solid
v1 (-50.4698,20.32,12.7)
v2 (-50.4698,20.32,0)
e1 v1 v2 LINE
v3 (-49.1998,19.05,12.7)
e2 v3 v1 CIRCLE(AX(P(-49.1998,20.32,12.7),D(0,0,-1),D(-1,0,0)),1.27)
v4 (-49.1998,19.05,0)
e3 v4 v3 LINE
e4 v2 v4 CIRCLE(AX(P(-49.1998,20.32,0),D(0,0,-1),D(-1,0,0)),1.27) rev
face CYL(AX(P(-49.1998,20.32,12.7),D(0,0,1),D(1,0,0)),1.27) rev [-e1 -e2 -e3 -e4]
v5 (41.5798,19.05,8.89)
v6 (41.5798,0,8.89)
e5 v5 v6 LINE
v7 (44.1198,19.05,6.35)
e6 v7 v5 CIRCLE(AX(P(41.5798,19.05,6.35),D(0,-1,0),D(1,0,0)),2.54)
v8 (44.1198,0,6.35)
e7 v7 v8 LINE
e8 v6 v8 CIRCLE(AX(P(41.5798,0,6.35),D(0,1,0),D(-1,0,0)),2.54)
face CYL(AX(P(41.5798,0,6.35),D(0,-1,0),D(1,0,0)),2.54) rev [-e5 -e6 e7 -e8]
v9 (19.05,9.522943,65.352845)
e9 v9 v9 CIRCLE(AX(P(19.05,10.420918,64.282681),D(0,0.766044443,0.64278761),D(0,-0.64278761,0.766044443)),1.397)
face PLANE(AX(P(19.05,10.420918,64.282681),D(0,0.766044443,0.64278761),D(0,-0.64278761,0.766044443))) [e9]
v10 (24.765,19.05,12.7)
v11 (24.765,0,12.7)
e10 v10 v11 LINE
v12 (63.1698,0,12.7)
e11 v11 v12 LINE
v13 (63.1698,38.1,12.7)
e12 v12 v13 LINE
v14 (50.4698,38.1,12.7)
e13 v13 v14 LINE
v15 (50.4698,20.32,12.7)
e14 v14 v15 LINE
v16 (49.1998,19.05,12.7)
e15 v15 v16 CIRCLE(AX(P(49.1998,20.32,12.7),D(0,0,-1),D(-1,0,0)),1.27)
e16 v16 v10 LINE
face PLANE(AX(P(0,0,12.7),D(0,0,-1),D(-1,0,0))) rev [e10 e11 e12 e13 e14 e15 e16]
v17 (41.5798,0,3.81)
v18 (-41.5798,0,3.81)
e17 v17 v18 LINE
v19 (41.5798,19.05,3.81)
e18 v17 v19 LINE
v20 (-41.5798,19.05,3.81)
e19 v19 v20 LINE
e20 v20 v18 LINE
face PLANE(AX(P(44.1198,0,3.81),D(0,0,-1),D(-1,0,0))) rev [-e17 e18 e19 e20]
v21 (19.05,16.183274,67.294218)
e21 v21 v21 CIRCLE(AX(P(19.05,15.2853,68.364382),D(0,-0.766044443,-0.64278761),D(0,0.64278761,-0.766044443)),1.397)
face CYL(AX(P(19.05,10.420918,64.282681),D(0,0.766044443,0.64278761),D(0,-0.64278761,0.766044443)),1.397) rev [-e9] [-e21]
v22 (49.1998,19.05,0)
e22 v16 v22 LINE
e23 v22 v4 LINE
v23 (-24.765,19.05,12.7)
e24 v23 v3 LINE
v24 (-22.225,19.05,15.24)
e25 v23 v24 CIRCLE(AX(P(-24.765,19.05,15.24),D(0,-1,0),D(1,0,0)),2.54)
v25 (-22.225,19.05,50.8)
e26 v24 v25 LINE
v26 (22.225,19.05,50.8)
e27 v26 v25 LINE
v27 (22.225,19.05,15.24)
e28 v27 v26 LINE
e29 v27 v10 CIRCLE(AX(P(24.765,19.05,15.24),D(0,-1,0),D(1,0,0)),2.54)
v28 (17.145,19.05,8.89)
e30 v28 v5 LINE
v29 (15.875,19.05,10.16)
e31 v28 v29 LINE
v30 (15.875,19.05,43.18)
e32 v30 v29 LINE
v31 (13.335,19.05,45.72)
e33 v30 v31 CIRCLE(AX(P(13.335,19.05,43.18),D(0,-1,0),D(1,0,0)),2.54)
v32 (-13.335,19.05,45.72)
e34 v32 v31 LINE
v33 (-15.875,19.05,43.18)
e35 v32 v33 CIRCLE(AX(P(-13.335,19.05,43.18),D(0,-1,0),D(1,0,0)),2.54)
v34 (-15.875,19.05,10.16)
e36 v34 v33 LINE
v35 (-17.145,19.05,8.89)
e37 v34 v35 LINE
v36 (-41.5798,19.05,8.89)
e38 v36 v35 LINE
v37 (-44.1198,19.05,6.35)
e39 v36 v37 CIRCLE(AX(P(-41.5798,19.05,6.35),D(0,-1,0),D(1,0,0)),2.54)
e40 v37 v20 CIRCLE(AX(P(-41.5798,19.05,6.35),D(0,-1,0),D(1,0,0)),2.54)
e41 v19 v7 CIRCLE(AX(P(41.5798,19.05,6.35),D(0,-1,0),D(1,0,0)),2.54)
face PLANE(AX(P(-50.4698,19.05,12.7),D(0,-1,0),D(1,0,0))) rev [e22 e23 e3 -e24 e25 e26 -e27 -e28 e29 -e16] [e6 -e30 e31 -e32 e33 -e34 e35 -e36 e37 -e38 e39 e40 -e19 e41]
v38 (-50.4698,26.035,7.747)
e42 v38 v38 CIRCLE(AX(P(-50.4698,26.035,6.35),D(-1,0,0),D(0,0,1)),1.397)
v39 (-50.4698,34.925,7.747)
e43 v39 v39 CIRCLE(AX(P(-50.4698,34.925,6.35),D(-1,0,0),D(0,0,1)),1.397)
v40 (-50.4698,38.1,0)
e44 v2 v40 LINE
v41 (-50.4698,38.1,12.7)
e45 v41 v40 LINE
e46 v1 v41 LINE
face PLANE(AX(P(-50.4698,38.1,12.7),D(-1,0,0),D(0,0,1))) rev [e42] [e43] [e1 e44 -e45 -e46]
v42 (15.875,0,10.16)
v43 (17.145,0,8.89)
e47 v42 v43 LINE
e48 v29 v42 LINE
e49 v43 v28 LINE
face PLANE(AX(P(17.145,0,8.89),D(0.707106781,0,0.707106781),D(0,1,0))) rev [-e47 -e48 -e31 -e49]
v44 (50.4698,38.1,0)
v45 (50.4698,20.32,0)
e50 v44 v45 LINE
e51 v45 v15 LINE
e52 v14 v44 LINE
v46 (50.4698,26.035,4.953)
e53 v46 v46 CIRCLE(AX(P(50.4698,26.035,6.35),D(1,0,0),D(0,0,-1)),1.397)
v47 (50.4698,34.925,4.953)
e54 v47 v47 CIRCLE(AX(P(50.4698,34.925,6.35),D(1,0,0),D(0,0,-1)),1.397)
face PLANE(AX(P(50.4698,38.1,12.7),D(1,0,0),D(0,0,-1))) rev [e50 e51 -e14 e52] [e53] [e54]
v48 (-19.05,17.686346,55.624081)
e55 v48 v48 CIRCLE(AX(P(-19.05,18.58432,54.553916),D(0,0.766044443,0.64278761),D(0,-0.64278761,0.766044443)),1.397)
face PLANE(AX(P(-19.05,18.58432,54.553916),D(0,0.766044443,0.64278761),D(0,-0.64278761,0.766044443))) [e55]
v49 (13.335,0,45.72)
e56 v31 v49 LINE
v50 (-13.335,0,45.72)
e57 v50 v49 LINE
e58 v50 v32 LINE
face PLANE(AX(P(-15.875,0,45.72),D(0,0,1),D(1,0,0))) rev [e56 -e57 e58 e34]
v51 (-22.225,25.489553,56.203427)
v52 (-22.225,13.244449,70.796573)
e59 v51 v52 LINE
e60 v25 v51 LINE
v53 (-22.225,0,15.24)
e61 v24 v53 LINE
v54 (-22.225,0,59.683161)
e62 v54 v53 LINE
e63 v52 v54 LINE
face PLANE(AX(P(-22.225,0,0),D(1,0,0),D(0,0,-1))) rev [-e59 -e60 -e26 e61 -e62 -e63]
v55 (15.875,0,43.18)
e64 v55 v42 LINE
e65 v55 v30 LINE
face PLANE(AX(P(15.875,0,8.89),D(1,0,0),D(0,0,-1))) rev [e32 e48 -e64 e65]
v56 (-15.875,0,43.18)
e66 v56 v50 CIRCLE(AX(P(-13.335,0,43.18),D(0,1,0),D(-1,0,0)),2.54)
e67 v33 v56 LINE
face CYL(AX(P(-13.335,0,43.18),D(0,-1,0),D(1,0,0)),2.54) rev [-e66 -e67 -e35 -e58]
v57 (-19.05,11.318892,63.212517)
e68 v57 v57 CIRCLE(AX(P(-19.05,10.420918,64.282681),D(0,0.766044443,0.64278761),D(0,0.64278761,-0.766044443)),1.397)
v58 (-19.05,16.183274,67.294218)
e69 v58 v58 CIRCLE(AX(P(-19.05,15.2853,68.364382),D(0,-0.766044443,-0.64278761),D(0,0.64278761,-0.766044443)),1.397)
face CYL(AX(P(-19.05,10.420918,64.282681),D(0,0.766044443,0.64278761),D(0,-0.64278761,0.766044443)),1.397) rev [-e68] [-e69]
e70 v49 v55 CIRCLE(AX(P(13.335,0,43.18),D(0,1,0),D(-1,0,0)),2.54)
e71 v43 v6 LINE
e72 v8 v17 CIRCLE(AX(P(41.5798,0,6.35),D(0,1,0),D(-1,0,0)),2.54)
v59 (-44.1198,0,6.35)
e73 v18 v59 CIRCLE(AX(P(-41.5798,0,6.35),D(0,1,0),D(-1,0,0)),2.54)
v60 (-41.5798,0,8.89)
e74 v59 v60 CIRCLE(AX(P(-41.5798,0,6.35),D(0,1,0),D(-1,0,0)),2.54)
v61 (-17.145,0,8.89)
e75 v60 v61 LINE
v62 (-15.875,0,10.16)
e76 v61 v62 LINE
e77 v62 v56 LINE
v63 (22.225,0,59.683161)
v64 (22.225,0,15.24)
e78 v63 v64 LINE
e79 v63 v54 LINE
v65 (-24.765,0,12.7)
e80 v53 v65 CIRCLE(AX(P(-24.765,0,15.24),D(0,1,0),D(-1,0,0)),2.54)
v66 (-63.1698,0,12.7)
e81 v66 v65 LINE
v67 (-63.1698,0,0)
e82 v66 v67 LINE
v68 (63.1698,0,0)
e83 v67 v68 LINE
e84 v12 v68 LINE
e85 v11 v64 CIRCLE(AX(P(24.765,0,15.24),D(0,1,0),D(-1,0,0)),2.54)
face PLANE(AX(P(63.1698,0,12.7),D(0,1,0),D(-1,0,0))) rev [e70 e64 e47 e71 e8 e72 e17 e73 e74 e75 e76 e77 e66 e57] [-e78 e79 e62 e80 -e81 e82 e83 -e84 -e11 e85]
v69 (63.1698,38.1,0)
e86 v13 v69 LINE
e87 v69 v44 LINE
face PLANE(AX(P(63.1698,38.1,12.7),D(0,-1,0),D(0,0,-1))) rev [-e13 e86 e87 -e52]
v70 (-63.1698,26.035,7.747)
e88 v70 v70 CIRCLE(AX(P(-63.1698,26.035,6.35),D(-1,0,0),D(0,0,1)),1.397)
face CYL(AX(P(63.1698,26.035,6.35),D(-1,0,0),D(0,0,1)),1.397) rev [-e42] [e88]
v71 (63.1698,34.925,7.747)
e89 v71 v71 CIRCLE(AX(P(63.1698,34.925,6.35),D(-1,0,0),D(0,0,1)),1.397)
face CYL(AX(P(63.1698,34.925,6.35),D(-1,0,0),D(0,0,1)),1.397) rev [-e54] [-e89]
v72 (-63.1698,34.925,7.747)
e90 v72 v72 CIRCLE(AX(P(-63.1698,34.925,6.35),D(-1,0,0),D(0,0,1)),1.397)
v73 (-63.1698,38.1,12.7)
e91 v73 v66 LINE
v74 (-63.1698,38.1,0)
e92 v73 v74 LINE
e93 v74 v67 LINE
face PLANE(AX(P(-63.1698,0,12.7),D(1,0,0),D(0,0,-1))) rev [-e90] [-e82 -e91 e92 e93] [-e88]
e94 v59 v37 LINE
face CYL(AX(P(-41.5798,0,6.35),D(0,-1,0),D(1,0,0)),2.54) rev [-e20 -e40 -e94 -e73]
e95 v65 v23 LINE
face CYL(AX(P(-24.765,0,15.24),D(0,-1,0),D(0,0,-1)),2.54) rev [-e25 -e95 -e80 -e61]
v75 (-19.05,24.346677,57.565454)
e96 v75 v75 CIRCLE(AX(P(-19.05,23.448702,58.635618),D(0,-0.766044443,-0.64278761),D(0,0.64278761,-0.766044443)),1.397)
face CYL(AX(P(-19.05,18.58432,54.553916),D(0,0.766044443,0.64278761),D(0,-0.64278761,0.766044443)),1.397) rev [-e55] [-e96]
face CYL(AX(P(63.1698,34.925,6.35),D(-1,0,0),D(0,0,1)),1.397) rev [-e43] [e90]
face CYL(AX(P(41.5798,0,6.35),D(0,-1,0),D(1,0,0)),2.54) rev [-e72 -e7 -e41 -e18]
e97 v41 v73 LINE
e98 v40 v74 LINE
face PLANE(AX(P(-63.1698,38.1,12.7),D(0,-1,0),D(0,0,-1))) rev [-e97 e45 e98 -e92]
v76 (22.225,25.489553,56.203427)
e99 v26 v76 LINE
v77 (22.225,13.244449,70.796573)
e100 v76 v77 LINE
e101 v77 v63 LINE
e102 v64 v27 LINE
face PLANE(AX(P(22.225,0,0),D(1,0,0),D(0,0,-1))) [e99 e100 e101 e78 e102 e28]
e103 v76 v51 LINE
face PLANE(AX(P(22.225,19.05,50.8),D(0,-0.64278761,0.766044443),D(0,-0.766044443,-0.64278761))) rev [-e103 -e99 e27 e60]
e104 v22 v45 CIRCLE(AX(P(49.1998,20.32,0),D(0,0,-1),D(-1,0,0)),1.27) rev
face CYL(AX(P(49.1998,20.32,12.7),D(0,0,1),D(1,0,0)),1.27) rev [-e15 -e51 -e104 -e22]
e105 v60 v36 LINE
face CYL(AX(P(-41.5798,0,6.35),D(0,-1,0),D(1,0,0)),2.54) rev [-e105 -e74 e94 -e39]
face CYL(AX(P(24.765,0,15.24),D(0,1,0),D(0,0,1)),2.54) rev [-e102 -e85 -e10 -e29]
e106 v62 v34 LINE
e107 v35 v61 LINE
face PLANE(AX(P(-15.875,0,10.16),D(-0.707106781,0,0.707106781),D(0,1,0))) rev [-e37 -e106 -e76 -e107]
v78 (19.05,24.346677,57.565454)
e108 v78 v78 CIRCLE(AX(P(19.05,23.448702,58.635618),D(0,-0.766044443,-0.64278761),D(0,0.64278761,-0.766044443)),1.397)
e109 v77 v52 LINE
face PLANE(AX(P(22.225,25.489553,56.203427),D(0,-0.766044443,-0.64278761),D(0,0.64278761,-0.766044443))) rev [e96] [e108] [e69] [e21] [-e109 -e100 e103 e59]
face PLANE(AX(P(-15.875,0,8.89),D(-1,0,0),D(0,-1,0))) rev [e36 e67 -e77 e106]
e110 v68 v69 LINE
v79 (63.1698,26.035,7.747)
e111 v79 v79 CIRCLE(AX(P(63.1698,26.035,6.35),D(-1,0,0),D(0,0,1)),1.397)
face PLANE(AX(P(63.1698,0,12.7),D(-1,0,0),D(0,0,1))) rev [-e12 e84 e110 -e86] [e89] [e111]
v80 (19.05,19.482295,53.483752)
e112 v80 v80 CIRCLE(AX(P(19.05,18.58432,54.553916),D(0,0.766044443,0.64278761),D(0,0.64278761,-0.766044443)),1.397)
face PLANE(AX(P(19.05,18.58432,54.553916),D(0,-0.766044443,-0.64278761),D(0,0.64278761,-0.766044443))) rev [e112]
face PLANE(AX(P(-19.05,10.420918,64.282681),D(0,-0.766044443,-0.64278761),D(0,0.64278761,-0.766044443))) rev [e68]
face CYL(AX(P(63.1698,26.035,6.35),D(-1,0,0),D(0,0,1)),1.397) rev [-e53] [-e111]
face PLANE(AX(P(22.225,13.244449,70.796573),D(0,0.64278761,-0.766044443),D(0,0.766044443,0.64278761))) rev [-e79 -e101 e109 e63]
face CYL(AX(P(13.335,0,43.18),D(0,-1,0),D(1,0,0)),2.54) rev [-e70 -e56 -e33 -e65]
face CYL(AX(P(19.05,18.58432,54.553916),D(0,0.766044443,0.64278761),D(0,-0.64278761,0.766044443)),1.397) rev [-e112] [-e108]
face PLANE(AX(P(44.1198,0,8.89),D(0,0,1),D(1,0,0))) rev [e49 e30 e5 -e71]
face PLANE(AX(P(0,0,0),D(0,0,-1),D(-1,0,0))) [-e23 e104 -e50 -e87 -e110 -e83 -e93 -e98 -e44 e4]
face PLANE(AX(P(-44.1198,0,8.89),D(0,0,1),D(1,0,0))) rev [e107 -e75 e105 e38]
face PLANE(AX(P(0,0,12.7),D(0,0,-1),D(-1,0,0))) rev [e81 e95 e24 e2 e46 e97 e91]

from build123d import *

# Parameters (mm, degrees)
BOSS_EXTRUDE1_DEPTH = 12.7
SKETCH2_R           = 1.397
CUT_EXTRUDE1_DEPTH  = 133.569206561
FILLET1_R           = 1.27
BOSS_EXTRUDE2_DEPTH = 22.225
CUT_EXTRUDE3_DEPTH  = 97.775414884
FILLET3_R           = 2.54
CHAMFER1_SIZE       = 1.27
SKETCH7_R           = 1.397
CUT_EXTRUDE4_DEPTH  = 6.35


with BuildPart() as part:
    # Sketch1 → Boss-Extrude1 (new body)
    with BuildSketch(Plane.XY):
        Polygon((63.1698, 0), (-63.1698, 0), (-63.1698, 38.1), (-50.4698, 38.1), (-50.4698, 19.05), (50.4698, 19.05), (50.4698, 38.1), (63.1698, 38.1), align=None)
    extrude(amount=BOSS_EXTRUDE1_DEPTH)

    # Sketch2 → Cut-Extrude1 (cut, through all)
    with BuildSketch(Plane.ZY.offset(63.1698)):
        with Locations((6.35, 34.925)):
            Circle(SKETCH2_R)
        with Locations((6.35, 26.035)):
            Circle(SKETCH2_R)
    extrude(amount=-CUT_EXTRUDE1_DEPTH, mode=Mode.SUBTRACT)

    # Fillet1
    fillet1_edges = [part.edges().sort_by_distance(p)[0] for p in [
        (-50.4698, 19.05, 6.35),
        (50.4698, 19.05, 6.35),
    ]]
    fillet(fillet1_edges, radius=FILLET1_R)

    # Sketch3 → Boss-Extrude2 (add, symmetric)
    with BuildSketch(Plane(origin=(0, 0, 0), x_dir=(0, 0, -1), z_dir=(1, 0, 0))):
        Polygon((-12.7, 19.05), (-12.7, 0), (-59.683160888, 0), (-70.796573321, 13.244449193), (-56.203426679, 25.489553157), (-50.8, 19.05), align=None)
    extrude(amount=BOSS_EXTRUDE2_DEPTH, both=True)

    # Sketch6 → Cut-Extrude3 (cut, through all)
    with BuildSketch(Plane(origin=(0, 19.05, 0), x_dir=(1, 0, 0), z_dir=(0, 1, 0))):
        Polygon((44.1198, -3.81), (-44.1198, -3.81), (-44.1198, -8.89), (-15.875, -8.89), (-15.875, -45.72), (15.875, -45.72), (15.875, -8.89), (44.1198, -8.89), align=None)
    extrude(amount=-CUT_EXTRUDE3_DEPTH, mode=Mode.SUBTRACT)

    # Fillet3
    fillet3_edges = [part.edges().sort_by_distance(p)[0] for p in [
        (44.1198, 9.525, 8.89),
        (44.1198, 9.525, 3.81),
        (15.875, 9.525, 45.72),
        (-15.875, 9.525, 45.72),
        (-44.1198, 9.525, 8.89),
        (-44.1198, 9.525, 3.81),
        (22.225, 9.525, 12.7),
        (-22.225, 9.525, 12.7),
    ]]
    fillet(fillet3_edges, radius=FILLET3_R - 0.0001)  # a hair under: the kernel refuses the full size

    # Chamfer1
    chamfer1_edges = [part.edges().sort_by_distance(p)[0] for p in [
        (15.875, 9.525, 8.89),
        (-15.875, 9.525, 8.89),
    ]]
    chamfer(chamfer1_edges, length=CHAMFER1_SIZE)

    # Sketch7 → Cut-Extrude4 (cut, symmetric)
    with BuildSketch(Plane(origin=(0, 42.632668976, 35.773056814), x_dir=(1, 0, 0), z_dir=(0, 0.7660444431189747, 0.6427876096865435))):
        with Locations(Location((-19.05, -29.844953746, 0), (0, 0, 270))):
            Circle(SKETCH7_R)
        with Locations(Location((-19.05, -42.544953746, 0), (0, 0, 90))):
            Circle(SKETCH7_R)
        with Locations(Location((19.05, -42.544953746, 0), (0, 0, 270))):
            Circle(SKETCH7_R)
        with Locations(Location((19.05, -29.844953746, 0), (0, 0, 90))):
            Circle(SKETCH7_R)
    extrude(amount=CUT_EXTRUDE4_DEPTH, both=True, mode=Mode.SUBTRACT)


solid = part.part
